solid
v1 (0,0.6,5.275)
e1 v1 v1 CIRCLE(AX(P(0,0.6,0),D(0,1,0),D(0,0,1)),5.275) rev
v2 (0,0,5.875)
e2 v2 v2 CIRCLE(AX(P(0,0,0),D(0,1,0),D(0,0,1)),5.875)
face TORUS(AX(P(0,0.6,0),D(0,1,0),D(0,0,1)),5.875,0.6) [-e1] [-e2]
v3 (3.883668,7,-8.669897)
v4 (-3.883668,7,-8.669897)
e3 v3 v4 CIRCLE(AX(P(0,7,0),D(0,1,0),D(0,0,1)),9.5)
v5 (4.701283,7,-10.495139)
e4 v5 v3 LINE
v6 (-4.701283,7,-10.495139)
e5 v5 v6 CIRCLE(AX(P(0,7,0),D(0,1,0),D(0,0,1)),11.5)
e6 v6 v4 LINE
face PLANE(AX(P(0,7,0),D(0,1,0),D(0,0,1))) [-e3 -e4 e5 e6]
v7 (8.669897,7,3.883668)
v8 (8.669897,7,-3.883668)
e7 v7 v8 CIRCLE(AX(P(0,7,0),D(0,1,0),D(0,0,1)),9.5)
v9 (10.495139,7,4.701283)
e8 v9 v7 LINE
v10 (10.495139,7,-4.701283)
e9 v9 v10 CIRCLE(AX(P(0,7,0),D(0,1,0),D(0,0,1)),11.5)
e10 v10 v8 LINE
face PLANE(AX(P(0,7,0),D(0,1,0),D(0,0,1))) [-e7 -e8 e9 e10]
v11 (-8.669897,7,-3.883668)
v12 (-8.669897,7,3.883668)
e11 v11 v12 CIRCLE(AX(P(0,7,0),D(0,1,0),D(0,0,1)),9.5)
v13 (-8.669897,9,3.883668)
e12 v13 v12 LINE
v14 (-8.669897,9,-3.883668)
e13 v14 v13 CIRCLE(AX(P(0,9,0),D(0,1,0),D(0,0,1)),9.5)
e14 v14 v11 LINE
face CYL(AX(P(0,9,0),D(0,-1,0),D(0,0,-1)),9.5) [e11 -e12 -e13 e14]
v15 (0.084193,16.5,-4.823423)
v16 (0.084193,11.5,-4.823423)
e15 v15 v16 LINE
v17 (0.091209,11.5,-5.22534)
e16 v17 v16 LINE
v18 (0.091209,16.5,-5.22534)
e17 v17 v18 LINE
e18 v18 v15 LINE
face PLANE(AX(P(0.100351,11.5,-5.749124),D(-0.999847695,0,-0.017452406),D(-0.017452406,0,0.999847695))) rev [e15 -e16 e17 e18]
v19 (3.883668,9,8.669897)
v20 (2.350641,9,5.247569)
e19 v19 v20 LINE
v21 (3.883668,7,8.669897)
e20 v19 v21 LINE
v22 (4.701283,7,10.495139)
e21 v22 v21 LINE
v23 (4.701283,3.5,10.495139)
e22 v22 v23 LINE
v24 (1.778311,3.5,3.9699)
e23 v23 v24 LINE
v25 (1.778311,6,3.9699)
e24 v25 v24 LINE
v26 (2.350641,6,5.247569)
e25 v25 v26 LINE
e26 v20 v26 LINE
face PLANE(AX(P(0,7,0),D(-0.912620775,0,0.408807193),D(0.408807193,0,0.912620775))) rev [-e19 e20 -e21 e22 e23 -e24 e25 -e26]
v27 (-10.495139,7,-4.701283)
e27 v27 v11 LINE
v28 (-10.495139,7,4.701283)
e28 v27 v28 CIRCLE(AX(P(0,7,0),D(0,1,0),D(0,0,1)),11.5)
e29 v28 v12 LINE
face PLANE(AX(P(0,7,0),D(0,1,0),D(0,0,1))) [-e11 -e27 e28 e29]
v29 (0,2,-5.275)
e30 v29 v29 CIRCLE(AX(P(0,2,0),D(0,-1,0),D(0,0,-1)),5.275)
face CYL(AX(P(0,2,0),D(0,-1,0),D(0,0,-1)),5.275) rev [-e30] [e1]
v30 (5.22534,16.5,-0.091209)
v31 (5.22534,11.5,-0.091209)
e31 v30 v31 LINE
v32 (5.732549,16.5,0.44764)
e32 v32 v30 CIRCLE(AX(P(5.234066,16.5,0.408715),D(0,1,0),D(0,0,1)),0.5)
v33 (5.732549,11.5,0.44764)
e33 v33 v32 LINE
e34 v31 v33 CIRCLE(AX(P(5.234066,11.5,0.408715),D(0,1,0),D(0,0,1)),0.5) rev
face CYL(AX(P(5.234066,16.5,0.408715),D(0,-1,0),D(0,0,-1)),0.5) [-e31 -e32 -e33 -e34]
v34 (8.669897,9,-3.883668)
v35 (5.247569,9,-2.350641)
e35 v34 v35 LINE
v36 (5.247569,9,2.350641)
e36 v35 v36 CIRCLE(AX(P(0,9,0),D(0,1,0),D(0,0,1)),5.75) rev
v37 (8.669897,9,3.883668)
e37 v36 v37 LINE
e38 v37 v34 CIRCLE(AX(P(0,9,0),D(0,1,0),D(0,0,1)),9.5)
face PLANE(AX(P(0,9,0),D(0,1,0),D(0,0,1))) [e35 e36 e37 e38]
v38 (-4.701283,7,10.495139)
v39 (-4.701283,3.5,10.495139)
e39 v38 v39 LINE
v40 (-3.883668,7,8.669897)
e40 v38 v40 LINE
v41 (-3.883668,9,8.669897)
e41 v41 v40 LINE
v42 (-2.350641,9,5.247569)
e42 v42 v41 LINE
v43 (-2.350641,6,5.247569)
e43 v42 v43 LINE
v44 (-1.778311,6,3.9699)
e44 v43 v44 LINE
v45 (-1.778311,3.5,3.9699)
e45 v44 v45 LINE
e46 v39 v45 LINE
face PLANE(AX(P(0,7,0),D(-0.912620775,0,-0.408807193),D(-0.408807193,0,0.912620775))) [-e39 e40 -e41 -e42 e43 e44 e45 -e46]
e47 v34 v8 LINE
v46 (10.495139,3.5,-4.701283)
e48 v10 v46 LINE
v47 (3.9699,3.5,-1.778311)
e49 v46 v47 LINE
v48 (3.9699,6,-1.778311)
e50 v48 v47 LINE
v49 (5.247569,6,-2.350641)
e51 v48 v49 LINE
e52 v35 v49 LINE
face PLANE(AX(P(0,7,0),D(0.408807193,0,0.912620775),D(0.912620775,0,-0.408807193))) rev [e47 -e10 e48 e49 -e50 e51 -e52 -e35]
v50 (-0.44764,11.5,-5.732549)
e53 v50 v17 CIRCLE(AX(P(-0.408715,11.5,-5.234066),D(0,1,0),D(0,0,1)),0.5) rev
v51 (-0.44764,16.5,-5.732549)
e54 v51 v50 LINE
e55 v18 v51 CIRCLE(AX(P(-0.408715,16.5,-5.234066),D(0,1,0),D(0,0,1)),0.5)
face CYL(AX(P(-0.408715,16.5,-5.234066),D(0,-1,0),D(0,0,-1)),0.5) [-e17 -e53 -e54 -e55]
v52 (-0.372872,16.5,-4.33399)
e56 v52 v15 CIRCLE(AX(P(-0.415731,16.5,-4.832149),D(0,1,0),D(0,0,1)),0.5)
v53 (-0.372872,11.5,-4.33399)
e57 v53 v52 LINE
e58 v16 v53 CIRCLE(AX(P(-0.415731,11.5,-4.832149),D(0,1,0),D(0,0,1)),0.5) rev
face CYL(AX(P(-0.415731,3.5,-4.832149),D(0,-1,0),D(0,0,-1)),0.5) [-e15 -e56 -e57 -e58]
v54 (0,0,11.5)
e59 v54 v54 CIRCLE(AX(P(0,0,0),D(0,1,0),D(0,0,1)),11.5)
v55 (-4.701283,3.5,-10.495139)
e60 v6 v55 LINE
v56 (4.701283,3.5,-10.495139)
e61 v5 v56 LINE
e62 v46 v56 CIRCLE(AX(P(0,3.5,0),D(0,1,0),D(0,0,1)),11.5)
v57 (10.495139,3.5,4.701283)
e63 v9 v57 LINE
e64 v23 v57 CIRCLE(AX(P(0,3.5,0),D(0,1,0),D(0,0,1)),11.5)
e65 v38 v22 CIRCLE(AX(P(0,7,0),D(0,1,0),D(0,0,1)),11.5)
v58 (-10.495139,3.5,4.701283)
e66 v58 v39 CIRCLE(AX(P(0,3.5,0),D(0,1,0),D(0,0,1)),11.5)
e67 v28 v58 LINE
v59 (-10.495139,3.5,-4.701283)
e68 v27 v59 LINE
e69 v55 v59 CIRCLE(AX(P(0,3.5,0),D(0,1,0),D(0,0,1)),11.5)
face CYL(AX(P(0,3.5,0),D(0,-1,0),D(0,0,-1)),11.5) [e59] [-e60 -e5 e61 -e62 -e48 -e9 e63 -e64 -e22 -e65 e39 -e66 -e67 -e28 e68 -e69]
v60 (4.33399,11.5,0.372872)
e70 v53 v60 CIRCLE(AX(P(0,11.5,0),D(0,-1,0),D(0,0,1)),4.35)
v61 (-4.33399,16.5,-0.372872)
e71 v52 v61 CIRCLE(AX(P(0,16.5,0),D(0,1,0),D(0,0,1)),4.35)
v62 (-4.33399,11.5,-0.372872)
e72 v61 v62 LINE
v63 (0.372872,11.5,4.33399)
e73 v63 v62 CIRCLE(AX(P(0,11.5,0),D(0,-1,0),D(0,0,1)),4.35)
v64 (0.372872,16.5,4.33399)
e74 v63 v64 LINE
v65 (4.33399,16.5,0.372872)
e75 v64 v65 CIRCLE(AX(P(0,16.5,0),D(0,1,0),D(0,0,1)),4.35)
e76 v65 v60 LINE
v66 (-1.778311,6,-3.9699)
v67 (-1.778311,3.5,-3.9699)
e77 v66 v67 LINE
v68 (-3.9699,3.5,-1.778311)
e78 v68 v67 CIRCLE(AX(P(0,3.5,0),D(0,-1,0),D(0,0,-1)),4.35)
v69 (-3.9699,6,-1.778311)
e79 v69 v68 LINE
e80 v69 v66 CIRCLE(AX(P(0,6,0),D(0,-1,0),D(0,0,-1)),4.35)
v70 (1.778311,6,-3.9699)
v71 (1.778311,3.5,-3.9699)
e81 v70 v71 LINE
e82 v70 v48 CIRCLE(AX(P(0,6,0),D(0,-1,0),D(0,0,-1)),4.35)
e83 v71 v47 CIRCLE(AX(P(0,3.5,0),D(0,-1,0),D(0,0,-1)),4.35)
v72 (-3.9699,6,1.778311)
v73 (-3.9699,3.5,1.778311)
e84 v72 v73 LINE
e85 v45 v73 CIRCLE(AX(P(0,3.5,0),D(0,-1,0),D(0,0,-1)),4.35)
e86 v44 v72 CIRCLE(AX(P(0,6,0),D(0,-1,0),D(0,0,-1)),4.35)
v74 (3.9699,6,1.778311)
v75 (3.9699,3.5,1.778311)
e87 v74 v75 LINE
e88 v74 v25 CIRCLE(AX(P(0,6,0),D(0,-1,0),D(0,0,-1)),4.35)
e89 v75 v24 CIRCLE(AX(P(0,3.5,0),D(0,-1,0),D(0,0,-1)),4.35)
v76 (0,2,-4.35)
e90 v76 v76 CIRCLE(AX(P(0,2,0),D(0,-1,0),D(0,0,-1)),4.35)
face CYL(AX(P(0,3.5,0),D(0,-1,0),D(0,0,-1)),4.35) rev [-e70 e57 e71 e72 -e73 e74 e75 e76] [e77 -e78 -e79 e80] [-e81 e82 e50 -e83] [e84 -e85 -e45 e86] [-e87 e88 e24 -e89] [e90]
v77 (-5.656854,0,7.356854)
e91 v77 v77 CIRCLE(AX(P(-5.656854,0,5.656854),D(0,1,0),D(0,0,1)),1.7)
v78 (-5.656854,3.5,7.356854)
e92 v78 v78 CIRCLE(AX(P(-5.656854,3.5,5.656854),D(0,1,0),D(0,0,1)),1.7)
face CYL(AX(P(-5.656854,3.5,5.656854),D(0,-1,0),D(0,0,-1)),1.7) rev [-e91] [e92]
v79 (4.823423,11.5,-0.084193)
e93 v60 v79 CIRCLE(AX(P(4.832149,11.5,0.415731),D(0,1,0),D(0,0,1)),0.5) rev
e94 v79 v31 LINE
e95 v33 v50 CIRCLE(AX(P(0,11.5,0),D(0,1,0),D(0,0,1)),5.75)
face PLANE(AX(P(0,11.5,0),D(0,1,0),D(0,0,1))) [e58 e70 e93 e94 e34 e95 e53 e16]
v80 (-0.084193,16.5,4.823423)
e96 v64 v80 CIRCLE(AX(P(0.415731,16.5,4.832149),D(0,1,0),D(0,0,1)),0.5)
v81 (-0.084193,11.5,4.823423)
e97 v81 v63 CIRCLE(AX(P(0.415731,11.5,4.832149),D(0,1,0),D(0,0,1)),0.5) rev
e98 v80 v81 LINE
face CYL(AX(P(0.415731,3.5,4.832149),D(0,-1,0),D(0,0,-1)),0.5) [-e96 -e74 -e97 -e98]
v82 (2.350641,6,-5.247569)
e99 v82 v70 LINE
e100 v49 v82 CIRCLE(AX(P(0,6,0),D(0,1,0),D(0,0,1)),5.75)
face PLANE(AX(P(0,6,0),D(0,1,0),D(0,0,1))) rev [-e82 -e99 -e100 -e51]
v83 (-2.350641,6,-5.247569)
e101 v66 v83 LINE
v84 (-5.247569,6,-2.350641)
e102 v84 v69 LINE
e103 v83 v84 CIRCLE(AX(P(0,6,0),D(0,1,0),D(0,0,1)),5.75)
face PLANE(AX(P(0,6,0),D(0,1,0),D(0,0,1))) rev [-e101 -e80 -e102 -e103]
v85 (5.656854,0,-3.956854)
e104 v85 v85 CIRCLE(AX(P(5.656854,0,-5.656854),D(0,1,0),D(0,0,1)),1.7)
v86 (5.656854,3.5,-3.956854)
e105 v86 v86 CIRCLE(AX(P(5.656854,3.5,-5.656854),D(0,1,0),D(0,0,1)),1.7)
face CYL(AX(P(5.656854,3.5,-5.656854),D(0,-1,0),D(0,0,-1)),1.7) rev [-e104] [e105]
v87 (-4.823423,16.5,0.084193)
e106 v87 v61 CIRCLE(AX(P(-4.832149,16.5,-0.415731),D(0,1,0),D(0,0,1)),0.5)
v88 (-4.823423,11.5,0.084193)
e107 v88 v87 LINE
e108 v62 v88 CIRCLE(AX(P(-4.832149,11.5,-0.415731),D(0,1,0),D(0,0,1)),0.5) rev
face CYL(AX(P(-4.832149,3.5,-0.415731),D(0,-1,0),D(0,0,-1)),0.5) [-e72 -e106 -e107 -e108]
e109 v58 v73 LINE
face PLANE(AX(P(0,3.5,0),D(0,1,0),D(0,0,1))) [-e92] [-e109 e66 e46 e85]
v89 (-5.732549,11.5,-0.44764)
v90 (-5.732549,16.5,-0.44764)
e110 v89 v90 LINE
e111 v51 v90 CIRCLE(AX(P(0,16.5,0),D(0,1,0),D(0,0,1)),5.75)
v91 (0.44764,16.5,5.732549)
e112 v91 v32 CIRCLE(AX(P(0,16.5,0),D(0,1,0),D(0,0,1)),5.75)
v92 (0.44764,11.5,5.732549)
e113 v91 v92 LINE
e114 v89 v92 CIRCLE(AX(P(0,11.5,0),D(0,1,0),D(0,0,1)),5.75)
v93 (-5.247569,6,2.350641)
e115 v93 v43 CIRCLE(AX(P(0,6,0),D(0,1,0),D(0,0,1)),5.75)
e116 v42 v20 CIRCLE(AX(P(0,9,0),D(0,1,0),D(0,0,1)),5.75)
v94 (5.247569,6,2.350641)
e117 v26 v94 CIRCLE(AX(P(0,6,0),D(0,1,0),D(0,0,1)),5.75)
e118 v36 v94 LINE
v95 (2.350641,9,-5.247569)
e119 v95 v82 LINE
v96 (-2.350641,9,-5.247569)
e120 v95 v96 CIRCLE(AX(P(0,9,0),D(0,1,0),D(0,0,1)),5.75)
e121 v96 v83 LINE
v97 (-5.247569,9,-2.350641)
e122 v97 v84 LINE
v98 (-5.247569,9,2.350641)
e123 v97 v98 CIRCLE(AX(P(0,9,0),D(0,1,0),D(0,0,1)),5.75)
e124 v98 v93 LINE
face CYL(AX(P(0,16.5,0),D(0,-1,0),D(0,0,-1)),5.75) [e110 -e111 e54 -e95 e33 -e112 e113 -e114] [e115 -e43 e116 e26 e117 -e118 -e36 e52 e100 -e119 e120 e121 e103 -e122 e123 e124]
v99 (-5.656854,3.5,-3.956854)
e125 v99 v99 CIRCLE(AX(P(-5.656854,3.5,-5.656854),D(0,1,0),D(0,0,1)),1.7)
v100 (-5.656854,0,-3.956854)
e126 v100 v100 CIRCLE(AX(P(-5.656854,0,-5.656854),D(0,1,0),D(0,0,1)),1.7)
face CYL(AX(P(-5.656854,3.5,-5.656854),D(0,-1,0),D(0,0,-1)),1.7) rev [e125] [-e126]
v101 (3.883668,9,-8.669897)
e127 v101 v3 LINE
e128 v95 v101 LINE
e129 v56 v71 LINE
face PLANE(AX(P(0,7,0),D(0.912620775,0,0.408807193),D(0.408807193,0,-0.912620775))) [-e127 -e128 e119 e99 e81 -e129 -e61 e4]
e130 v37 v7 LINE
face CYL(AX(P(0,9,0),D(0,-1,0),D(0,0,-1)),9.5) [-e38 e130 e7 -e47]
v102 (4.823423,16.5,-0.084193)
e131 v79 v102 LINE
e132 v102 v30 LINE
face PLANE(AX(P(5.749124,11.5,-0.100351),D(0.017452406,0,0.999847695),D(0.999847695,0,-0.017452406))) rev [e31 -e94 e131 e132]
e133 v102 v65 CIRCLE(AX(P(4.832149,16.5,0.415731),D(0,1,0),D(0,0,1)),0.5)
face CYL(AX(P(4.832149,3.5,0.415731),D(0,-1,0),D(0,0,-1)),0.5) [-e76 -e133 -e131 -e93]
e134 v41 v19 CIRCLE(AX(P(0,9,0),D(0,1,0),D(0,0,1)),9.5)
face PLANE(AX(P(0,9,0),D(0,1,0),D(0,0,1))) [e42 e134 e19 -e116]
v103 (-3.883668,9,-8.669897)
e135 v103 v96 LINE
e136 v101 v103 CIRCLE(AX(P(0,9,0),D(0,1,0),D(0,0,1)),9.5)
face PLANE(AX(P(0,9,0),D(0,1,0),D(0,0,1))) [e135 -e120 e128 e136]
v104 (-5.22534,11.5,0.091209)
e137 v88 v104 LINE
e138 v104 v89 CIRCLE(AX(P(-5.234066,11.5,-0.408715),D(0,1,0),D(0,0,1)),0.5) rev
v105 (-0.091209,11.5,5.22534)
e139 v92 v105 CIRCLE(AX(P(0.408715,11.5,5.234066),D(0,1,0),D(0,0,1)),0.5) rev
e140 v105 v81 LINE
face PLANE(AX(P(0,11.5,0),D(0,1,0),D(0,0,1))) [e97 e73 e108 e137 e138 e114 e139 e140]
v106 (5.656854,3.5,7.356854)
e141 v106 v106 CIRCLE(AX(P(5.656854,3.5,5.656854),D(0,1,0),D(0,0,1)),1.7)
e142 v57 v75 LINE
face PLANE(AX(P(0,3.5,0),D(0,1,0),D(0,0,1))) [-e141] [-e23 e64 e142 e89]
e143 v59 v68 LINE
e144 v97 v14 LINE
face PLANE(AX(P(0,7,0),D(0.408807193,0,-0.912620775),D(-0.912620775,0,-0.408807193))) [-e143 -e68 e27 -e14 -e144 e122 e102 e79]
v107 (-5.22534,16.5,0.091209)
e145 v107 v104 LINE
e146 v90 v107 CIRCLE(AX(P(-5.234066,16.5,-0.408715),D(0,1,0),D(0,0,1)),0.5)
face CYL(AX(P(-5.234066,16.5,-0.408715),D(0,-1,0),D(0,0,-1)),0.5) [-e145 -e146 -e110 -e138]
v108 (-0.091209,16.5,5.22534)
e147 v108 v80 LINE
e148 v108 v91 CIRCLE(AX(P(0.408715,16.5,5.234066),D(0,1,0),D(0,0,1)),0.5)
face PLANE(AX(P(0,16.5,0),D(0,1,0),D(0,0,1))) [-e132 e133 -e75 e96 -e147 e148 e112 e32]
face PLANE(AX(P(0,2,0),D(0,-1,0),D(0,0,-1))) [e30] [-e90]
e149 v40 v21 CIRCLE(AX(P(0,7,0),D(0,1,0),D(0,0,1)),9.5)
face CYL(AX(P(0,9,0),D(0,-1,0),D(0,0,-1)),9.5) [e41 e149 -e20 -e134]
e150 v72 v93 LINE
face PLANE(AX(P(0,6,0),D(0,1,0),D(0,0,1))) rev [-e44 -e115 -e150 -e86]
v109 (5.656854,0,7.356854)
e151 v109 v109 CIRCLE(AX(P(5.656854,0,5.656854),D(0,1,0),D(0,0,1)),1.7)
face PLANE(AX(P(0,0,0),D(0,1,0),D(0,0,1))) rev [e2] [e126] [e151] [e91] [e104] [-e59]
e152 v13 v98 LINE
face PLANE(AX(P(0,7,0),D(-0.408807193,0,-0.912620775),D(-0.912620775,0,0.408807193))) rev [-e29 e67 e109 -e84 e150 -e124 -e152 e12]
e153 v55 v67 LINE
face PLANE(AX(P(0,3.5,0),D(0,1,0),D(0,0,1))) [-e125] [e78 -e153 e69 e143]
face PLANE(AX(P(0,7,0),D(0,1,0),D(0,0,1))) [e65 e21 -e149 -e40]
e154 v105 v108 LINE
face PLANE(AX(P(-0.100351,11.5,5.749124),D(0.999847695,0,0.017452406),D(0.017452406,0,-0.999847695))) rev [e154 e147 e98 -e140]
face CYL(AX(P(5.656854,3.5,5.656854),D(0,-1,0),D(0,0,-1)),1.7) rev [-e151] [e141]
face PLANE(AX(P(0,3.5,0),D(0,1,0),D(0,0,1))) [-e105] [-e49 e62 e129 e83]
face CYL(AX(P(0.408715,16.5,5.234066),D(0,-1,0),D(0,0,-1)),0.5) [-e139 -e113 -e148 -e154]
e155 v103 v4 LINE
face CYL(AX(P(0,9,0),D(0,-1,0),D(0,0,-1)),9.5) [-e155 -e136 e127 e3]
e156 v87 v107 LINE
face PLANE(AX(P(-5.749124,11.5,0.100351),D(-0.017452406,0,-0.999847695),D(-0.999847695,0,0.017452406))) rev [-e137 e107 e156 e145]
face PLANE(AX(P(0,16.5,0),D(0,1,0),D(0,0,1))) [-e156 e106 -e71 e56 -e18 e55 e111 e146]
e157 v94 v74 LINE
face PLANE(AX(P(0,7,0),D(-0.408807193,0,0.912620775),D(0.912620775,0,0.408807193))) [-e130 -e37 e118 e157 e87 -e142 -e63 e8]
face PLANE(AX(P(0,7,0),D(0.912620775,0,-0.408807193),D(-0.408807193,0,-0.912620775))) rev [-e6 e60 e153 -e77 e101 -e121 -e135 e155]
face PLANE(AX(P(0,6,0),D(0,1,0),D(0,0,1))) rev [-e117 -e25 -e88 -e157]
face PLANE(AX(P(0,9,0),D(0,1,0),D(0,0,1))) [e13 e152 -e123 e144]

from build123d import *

# Parameters (mm, degrees)
CROQUIS1_R              = 11.5
CROQUIS1_R_2            = 4.35
CROQUIS1_R_3            = 1.7000000000000004
SALIENTE_EXTRUIR1_DEPTH = 3.5
CROQUIS2_R              = 5.75
CROQUIS2_R_2            = 4.35
SALIENTE_EXTRUIR2_DEPTH = 13
CORTAR_EXTRUIR1_START   = -5
CORTAR_EXTRUIR1_DEPTH   = 5
CROQUIS4_R              = 5.275
CROQUIS4_R_2            = 4.35
CORTAR_EXTRUIR2_DEPTH   = 2
REDONDEO1_R             = 0.6
REDONDEO2_R             = 0.5
SALIENTE_EXTRUIR3_DEPTH = 3.5
SALIENTE_EXTRUIR4_DEPTH = 2
CORTAR_EXTRUIR3_DEPTH   = 2.5


with BuildPart() as part:
    # Croquis1 → Saliente-Extruir1 (new body)
    with BuildSketch(Plane(origin=(0, 0, 0), x_dir=(1, 0, 0), z_dir=(0, 1, 0))):
        with Locations(Location((1.731948e-11, 0, 0), (0, 0, 270))):
            Circle(CROQUIS1_R)
        with Locations(Location((1.731948e-11, 0, 0), (0, 0, 270))):
            Circle(CROQUIS1_R_2, mode=Mode.SUBTRACT)
        with Locations(Location((5.656854249492441, 5.65685424949238, 0), (0, 0, 270))):
            Circle(CROQUIS1_R_3, mode=Mode.SUBTRACT)
        with Locations(Location((-5.656854249492318, 5.656854249492381, 0), (0, 0, 270))):
            Circle(CROQUIS1_R_3, mode=Mode.SUBTRACT)
        with Locations(Location((-5.656854249492318, -5.656854249492381, 0), (0, 0, 270))):
            Circle(CROQUIS1_R_3, mode=Mode.SUBTRACT)
        with Locations(Location((5.656854249492441, -5.65685424949238, 0), (0, 0, 270))):
            Circle(CROQUIS1_R_3, mode=Mode.SUBTRACT)
    extrude(amount=SALIENTE_EXTRUIR1_DEPTH)

    # Croquis2 → Saliente-Extruir2 (add)
    with BuildSketch(Plane(origin=(0, 3.5, 0), x_dir=(1, 0, 0), z_dir=(0, 1, 6e-17))):
        with Locations(Location((1.731948e-11, 0, 0), (0, 0, 90))):
            Circle(CROQUIS2_R)
        with Locations(Location((1.731948e-11, 0, 0), (0, 0, 270))):
            Circle(CROQUIS2_R_2, mode=Mode.SUBTRACT)
    extrude(amount=SALIENTE_EXTRUIR2_DEPTH)

    # Croquis3 → Cortar-Extruir1 (cut)
    with BuildSketch(Plane(origin=(0, 16.5, 1.01e-15), x_dir=(1, 0, 0), z_dir=(0, 1, 6e-17)).offset(CORTAR_EXTRUIR1_START)):
        with BuildLine():
            Line((-5.7491242471489485, -0.10035133701439494), (-4.3493374739299995, -0.07591796800219403))
            ThreePointArc((-4.3493374739299995, -0.07591796800219403), (-3.0759144981612514, -3.0759144981612847), (-0.07591796800214497, -4.34933747393))
            Line((-0.07591796800214497, -4.34933747393), (-0.10035133701433126, -5.7491242471489485))
            ThreePointArc((-0.10035133701433126, -5.7491242471489485), (-4.065863991822413, -4.065863991822457), (-5.7491242471489485, -0.10035133701439494))
        make_face()
        with BuildLine():
            Line((5.749124247183587, 0.10035133701435339), (4.349337473964638, 0.07591796800216172))
            ThreePointArc((4.349337473964638, 0.07591796800216172), (3.075914498198222, 3.0759144981732933), (0.07591796803681536, 4.3493374739299995))
            Line((0.07591796803681536, 4.3493374739299995), (0.10035133704901177, 5.749124247148948))
            ThreePointArc((0.10035133704901177, 5.749124247148948), (4.06586399185939, 4.065863991834459), (5.749124247183587, 0.10035133701435339))
        make_face()
    extrude(amount=CORTAR_EXTRUIR1_DEPTH, mode=Mode.SUBTRACT)

    # Croquis4 → Cortar-Extruir2 (cut)
    with BuildSketch(Plane.XZ):
        with Locations(Location((1.731948e-11, 0, 0), (0, 0, 270))):
            Circle(CROQUIS4_R)
        with Locations(Location((1.731948e-11, 0, 0), (0, 0, 270))):
            Circle(CROQUIS4_R_2, mode=Mode.SUBTRACT)
    extrude(amount=-CORTAR_EXTRUIR2_DEPTH, mode=Mode.SUBTRACT)

    # Redondeo1
    redondeo1_edges = [part.edges().sort_by_distance(p)[0] for p in [
        (1.732109e-11, 0, 5.275),
    ]]
    fillet(redondeo1_edges, radius=REDONDEO1_R)

    # Redondeo2
    # the kernel refuses this fillet: 0.5 mm, written as the material it takes off along each edge
    with BuildSketch(Plane(origin=(-0.10035133701433126, 11.5, 5.749124247148949), x_dir=(0.017452406437275973, 0, -0.9998476951563914), z_dir=(0, 1, 6e-17))) as redondeo2_piece_1:
        with BuildLine():
            CenterArc((0.5238637599066267, -0.5000000000000001), REDONDEO2_R, 90.00000000000004, 95.46502379971594)
            ThreePointArc((0.02613649894535296, -0.5476190476173979), (0.00653784155089456, -0.27412120398217477), (0, 0))
            Line((0, 0), (0.5238637599066264, 0))
        make_face()
    extrude(amount=6.3706060199107775, mode=Mode.SUBTRACT)
    with BuildSketch(Plane(origin=(-5.7491242471489485, 11.5, 0.10035133701439544), x_dir=(0.9998476951563913, 0, -0.01745240643728594), z_dir=(0, 1, 6e-17))) as redondeo2_piece_2:
        with BuildLine():
            CenterArc((0.5238637599253263, 0.5), REDONDEO2_R, 174.53497620009085, 95.46502379990915)
            ThreePointArc((0.02613649896421286, 0.5476190476190762), (0.00653784156877282, 0.2741212039826321), (0, 0))
            Line((0, 0), (0.5238637599253264, 0))
        make_face()
    extrude(amount=6.3706060199172185, mode=Mode.SUBTRACT)
    with BuildSketch(Plane(origin=(-4.3493374739299995, 11.5, 0.07591796800219473), x_dir=(0.03417818793243372, 0, -0.9994157550637548), z_dir=(0, 1, 6e-17))) as redondeo2_piece_3:
        with BuildLine():
            CenterArc((0.4748597695855003, 0.4993335237901514), REDONDEO2_R, 182.95864737806363, 84.08270524821285)
            Line((-0.02447375420269609, 0.47352592759711776), (0, 0))
            ThreePointArc((0, 0), (0.22452608671492605, 0.00579834302568299), (0.4490521734302907, 0))
        make_face()
    extrude(amount=6.18539489398967, mode=Mode.SUBTRACT)
    with BuildSketch(Plane(origin=(-0.07591796800214483, 11.5, 4.34933747393), x_dir=(0.9994157550651794, 0, -0.03417818789077768), z_dir=(0, 1, 6e-17))) as redondeo2_piece_4:
        with BuildLine():
            CenterArc((0.4748597696053468, -0.4993335237891691), REDONDEO2_R, 92.95864737590307, 84.082705248422)
            Line((-0.02447375418392556, -0.47352592761695317), (0, 0))
            ThreePointArc((0, 0), (0.22452608671557137, -0.0057983430342235), (0.44905217343114273, 0))
        make_face()
    extrude(amount=6.185394894036769, mode=Mode.SUBTRACT)
    with BuildSketch(Plane(origin=(0.10035133704901178, 11.5, -5.749124247148948), x_dir=(-0.017452406437283147, 0, 0.9998476951563912), z_dir=(0, 1, 6e-17))) as redondeo2_piece_5:
        with BuildLine():
            CenterArc((0.5238637599066267, -0.49999999999999994), REDONDEO2_R, 90.00000000000004, 95.46502379971594)
            ThreePointArc((0.02613649894535335, -0.5476190476173982), (0.00653784155089565, -0.27412120398217554), (0, 0))
            Line((0, 0), (0.5238637599066264, 0))
        make_face()
    extrude(amount=6.370606019910781, mode=Mode.SUBTRACT)
    with BuildSketch(Plane(origin=(5.749124247183587, 11.5, -0.10035133701435296), x_dir=(-0.9998476951563913, 0, 0.017452406437280254), z_dir=(0, 1, 6e-17))) as redondeo2_piece_6:
        with BuildLine():
            CenterArc((0.5238637599253252, 0.5000000000000001), REDONDEO2_R, 174.53497620009054, 95.46502379990937)
            ThreePointArc((0.02613649896421246, 0.5476190476190788), (0.00653784156877128, 0.27412120398263345), (0, 0))
            Line((0, 0), (0.5238637599253245, 0))
        make_face()
    extrude(amount=6.370606019917222, mode=Mode.SUBTRACT)
    with BuildSketch(Plane(origin=(4.349337473964638, 11.5, -0.07591796800216102), x_dir=(-0.03417818793243961, 0, 0.9994157550637546), z_dir=(0, 1, 6e-17))) as redondeo2_piece_7:
        with BuildLine():
            CenterArc((0.4748597695855018, 0.49933352379015083), REDONDEO2_R, 182.9586473780635, 84.08270524821285)
            Line((-0.02447375420269471, 0.4735259275971186), (0, 0))
            ThreePointArc((0, 0), (0.22452608671492558, 0.00579834302568341), (0.4490521734302912, 0))
        make_face()
    extrude(amount=6.185394893989674, mode=Mode.SUBTRACT)
    with BuildSketch(Plane(origin=(0.07591796803681525, 11.5, -4.349337473929999), x_dir=(-0.9994157550651797, 0, 0.03417818789076981), z_dir=(0, 1, 6e-17))) as redondeo2_piece_8:
        with BuildLine():
            CenterArc((0.47485976960534654, -0.4993335237891697), REDONDEO2_R, 92.9586473759031, 84.0827052484222)
            Line((-0.02447375418392593, -0.4735259276169559), (0, 0))
            ThreePointArc((0, 0), (0.22452608671556917, -0.00579834303422432), (0.4490521734311421, 0))
        make_face()
    extrude(amount=6.185394894036776, mode=Mode.SUBTRACT)

    # Croquis5 → Saliente-Extruir3 (add)
    with BuildSketch(Plane(origin=(0, 3.5, 0), x_dir=(1, 0, 0), z_dir=(0, 1, 6e-17))):
        with BuildLine():
            ThreePointArc((10.4951389110437, -4.701282722647084), (11.500000000017316, 2.423062e-11), (10.495138911023886, 4.701282722691312))
            Line((10.495138911023888, 4.701282722691313), (5.247569455520605, 2.350641361345657))
            ThreePointArc((5.247569455520605, 2.3506413613456574), (5.7500000000173195, 1.211642e-11), (5.247569455530511, -2.350641361323542))
            Line((5.247569455530511, -2.3506413613235417), (10.495138911043702, -4.701282722647084))
        make_face()
        with BuildLine():
            ThreePointArc((-4.701282722629764, -10.495138911026384), (4.155054e-11, -11.500000000000004), (4.701282722708632, -10.495138911006572))
            Line((4.701282722708633, -10.495138911006569), (2.3506413613629764, -5.247569455503285))
            ThreePointArc((2.3506413613629777, -5.247569455503285), (2.943645e-11, -5.75), (-2.350641361306222, -5.247569455513191))
            Line((-2.350641361306222, -5.247569455513191), (-4.701282722629764, -10.495138911026382))
        make_face()
        with BuildLine():
            ThreePointArc((4.701282722664406, 10.49513891102638), (-6.91114e-12, 11.5), (-4.701282722673994, 10.49513891100657))
            Line((-4.701282722673993, 10.495138911006569), (-2.3506413613283366, 5.247569455503284))
            ThreePointArc((-2.3506413613283352, 5.247569455503285), (5.20506e-12, 5.750000000000002), (2.3506413613408625, 5.24756945551319))
            Line((2.3506413613408625, 5.24756945551319), (4.701282722664406, 10.49513891102638))
        make_face()
        with BuildLine():
            ThreePointArc((-10.495138911009063, 4.7012827226470835), (-11.499999999982684, -2.423151e-11), (-10.49513891098925, -4.701282722691313))
            Line((-10.49513891098925, -4.701282722691314), (-5.247569455485966, -2.3506413613456574))
            ThreePointArc((-5.247569455485966, -2.3506413613456587), (-5.7499999999826805, -1.211753e-11), (-5.247569455495871, 2.3506413613235413))
            Line((-5.247569455495872, 2.3506413613235413), (-10.495138911009063, 4.7012827226470835))
        make_face()
    extrude(amount=SALIENTE_EXTRUIR3_DEPTH)

    # Croquis7 → Saliente-Extruir4 (add)
    with BuildSketch(Plane(origin=(0, 7, 4.8e-16), x_dir=(1, 0, 0), z_dir=(0, 1, 6e-17))):
        with BuildLine():
            Line((-5.247569455495871, 2.3506413613235413), (-8.669897361265344, 3.8836683360997637))
            ThreePointArc((-8.669897361265344, 3.8836683360997637), (-9.49999999998268, -2.001727e-11), (-8.669897361248976, -3.883668336136303))
            Line((-8.669897361248976, -3.883668336136303), (-5.247569455485966, -2.3506413613456574))
            ThreePointArc((-5.247569455485966, -2.3506413613456574), (-5.74999999998268, -1.211571e-11), (-5.247569455495871, 2.3506413613235413))
        make_face()
        with BuildLine():
            Line((2.3506413613408608, 5.24756945551319), (3.8836683361170823, 8.669897361282663))
            ThreePointArc((3.8836683361170823, 8.669897361282663), (-2.69837e-12, 9.5), (-3.883668336118984, 8.669897361266296))
            Line((-3.883668336118984, 8.669897361266296), (-2.3506413613283383, 5.247569455503285))
            ThreePointArc((-2.3506413613283383, 5.247569455503285), (5.20341e-12, 5.749999999999999), (2.3506413613408608, 5.24756945551319))
        make_face()
        with BuildLine():
            ThreePointArc((5.2475694555206065, 2.350641361345656), (5.7500000000173195, 1.211553e-11), (5.247569455530511, -2.350641361323542))
            Line((5.24756945553051, -2.3506413613235413), (8.669897361299984, -3.883668336099766))
            ThreePointArc((8.669897361299984, -3.883668336099768), (9.500000000017327, 2.001721e-11), (8.669897361283617, 3.883668336136305))
            Line((8.669897361283617, 3.883668336136302), (5.247569455520605, 2.3506413613456565))
        make_face()
        with BuildLine():
            Line((-2.350641361306222, -5.24756945551319), (-3.8836683360824447, -8.669897361282663))
            ThreePointArc((-3.8836683360824447, -8.669897361282663), (3.733849e-11, -9.5), (3.883668336153622, -8.669897361266296))
            Line((3.883668336153622, -8.669897361266296), (2.350641361362977, -5.247569455503285))
            ThreePointArc((2.350641361362977, -5.247569455503285), (2.943625e-11, -5.749999999999999), (-2.350641361306222, -5.24756945551319))
        make_face()
    extrude(amount=SALIENTE_EXTRUIR4_DEPTH)

    # Croquis8 → Cortar-Extruir3 (cut)
    with BuildSketch(Plane(origin=(0, 3.5, 0), x_dir=(1, 0, 0), z_dir=(0, 1, 6e-17))):
        with BuildLine():
            Line((-5.247569455495871, 2.3506413613235413), (-3.969900370675269, 1.7783112907404188))
            ThreePointArc((-3.969900370675269, 1.7783112907404188), (-3.0759144981506426, 3.075914498155002), (-1.7783112907398269, 3.9699003706850946))
            Line((-1.7783112907398269, 3.9699003706850946), (-2.3506413613283375, 5.247569455503285))
            ThreePointArc((-2.3506413613283375, 5.247569455503285), (-4.065863991813897, 4.065863991814082), (-5.247569455495871, 2.3506413613235413))
        make_face()
        with BuildLine():
            Line((5.247569455520605, 2.350641361345657), (3.969900370702414, 1.7783112907571466))
            ThreePointArc((3.969900370702414, 1.7783112907571466), (3.0759144981723208, 3.075914498167963), (1.778311290757738, 3.9699003706925886))
            Line((1.778311290757738, 3.9699003706925886), (2.3506413613408603, 5.24756945551319))
            ThreePointArc((2.3506413613408603, 5.24756945551319), (4.065863991831401, 4.0658639918312165), (5.247569455520605, 2.350641361345657))
        make_face()
        with BuildLine():
            Line((2.3506413613629764, -5.247569455503285), (1.7783112907744663, -3.9699003706850946))
            ThreePointArc((1.7783112907744663, -3.9699003706850946), (3.0759144981852824, -3.0759144981550013), (3.969900370709908, -1.7783112907404184))
            Line((3.969900370709908, -1.7783112907404184), (5.24756945553051, -2.350641361323541))
            ThreePointArc((5.24756945553051, -2.350641361323541), (4.065863991848536, -4.065863991814081), (2.3506413613629764, -5.247569455503285))
        make_face()
        with BuildLine():
            Line((-5.247569455485965, -2.3506413613456574), (-3.9699003706677742, -1.778311290757147))
            ThreePointArc((-3.9699003706677742, -1.778311290757147), (-3.0759144981376823, -3.0759144981679625), (-1.7783112907230985, -3.9699003706925886))
            Line((-1.7783112907230985, -3.9699003706925886), (-2.350641361306221, -5.247569455513191))
            ThreePointArc((-2.350641361306221, -5.247569455513191), (-4.0658639917967605, -4.0658639918312165), (-5.247569455485965, -2.3506413613456574))
        make_face()
    extrude(amount=CORTAR_EXTRUIR3_DEPTH, mode=Mode.SUBTRACT)


solid = part.part
